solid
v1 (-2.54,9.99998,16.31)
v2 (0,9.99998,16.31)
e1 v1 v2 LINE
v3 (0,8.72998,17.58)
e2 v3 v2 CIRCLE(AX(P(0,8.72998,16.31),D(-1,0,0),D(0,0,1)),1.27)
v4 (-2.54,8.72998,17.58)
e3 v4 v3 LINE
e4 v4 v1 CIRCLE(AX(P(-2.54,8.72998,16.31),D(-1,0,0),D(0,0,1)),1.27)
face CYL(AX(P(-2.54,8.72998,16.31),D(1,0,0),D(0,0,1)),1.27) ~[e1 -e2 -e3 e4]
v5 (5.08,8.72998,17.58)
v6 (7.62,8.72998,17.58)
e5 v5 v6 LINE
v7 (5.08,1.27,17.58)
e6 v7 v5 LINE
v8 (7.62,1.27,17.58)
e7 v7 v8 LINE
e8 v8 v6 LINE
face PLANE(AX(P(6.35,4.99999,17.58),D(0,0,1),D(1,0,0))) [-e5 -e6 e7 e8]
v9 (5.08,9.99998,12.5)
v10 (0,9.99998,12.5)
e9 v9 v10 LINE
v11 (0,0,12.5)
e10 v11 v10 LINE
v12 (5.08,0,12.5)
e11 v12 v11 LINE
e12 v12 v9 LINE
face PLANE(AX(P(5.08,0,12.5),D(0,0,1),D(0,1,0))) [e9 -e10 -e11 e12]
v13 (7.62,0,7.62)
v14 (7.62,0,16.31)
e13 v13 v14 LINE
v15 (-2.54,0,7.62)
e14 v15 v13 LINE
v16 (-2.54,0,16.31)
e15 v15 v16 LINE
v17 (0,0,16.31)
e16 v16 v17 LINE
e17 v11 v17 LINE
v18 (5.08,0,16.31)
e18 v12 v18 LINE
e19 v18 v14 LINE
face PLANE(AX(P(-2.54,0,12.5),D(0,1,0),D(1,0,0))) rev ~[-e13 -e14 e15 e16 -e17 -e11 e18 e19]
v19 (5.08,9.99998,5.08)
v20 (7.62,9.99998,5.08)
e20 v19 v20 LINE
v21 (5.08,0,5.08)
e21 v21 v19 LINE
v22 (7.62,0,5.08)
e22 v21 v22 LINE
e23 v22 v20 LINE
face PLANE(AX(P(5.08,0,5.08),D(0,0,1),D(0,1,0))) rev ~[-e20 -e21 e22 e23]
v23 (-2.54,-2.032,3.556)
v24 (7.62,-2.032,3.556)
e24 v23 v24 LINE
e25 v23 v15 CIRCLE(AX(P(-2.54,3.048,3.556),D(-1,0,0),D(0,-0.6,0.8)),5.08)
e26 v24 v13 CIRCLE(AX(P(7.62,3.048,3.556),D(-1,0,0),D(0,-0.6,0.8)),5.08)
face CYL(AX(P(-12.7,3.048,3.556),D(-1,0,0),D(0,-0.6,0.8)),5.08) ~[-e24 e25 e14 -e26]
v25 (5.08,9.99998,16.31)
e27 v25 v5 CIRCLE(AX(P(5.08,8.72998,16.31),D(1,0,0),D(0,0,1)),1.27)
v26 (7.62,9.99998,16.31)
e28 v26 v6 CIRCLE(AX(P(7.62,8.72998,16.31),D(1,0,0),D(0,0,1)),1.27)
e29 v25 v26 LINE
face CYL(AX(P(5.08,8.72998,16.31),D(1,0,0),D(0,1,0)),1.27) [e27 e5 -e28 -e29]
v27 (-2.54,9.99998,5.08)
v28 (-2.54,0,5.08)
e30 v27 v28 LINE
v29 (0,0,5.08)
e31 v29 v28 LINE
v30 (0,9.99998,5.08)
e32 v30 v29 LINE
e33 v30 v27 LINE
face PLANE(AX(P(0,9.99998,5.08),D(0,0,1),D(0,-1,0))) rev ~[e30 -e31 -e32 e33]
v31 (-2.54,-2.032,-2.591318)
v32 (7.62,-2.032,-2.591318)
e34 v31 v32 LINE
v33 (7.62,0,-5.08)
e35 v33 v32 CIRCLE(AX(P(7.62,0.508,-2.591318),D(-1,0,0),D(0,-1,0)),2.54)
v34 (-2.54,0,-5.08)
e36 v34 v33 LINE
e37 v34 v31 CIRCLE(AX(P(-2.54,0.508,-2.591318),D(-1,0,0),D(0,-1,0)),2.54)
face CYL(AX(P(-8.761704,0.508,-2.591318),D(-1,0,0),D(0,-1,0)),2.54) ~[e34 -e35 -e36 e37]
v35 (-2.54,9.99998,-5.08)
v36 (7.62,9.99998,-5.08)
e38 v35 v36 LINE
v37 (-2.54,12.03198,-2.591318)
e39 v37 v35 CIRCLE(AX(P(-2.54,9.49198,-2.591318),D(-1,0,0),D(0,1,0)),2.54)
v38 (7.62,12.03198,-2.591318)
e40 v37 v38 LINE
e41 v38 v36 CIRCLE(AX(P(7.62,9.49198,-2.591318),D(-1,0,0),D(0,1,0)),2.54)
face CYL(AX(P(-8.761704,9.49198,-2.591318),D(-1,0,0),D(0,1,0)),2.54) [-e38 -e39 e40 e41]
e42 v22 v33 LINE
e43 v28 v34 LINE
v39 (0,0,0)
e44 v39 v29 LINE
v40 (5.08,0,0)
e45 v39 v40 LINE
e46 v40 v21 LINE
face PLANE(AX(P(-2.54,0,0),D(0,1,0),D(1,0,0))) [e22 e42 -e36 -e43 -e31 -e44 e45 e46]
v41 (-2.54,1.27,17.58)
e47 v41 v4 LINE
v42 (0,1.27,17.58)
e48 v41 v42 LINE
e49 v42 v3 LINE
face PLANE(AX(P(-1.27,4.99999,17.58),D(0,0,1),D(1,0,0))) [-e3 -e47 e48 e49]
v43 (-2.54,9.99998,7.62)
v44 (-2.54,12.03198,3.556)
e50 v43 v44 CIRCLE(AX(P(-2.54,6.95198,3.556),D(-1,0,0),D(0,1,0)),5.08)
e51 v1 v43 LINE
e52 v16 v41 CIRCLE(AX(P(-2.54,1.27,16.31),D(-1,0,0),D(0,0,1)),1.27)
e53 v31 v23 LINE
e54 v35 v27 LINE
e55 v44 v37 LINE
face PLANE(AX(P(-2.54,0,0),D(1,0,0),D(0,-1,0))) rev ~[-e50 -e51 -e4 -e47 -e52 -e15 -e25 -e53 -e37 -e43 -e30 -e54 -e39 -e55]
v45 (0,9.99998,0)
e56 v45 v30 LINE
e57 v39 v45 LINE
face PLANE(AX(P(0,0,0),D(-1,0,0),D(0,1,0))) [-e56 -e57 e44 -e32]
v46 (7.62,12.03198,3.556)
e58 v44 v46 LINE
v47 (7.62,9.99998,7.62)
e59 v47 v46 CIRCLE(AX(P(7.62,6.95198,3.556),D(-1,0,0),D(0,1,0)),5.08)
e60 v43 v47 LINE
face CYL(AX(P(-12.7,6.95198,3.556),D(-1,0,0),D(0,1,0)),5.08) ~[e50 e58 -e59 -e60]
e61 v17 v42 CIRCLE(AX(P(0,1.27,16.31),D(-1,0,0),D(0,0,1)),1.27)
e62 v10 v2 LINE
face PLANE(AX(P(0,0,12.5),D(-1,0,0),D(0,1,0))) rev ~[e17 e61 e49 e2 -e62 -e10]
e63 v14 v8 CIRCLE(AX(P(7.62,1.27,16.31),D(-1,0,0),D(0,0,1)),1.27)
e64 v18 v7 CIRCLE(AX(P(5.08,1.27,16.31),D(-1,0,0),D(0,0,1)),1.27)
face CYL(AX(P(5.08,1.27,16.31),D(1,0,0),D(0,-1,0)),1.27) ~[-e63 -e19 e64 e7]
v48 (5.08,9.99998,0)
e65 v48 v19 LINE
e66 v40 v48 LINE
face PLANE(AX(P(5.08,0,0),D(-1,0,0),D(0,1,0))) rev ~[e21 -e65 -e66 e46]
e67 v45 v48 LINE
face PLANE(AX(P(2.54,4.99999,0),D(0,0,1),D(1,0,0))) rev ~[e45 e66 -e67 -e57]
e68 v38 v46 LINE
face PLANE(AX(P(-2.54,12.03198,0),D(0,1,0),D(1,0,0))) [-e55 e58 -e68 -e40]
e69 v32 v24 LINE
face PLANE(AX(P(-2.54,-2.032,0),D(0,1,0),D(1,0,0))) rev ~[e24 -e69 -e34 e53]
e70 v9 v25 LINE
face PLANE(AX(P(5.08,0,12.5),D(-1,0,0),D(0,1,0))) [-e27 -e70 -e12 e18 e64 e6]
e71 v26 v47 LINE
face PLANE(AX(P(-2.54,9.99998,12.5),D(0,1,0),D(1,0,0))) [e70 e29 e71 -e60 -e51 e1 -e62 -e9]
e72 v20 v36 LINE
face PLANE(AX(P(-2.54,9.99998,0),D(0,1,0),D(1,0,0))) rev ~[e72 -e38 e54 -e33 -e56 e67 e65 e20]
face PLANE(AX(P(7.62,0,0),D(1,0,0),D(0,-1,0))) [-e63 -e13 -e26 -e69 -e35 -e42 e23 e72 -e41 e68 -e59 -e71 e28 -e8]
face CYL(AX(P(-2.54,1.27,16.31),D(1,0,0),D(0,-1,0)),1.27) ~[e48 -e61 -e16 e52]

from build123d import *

# Parameters (mm, degrees)
F0_W          = 5.08
F0_H          = 9.99998
F1_DEPTH      = 12.5
F2_W          = 9.99998
F2_H          = 7.42
F3_DEPTH      = 2.54
F4_W          = 9.99998
F4_H          = 7.42
F5_DEPTH      = 2.54
F6_W          = 2.54
F6_H          = 9.99998
F7_DEPTH      = 5.08
F8_W          = 10.16
F8_H          = 2.032
F9_DEPTH      = 5.08
F9_DEPTH_BACK = 7.62
F10_T1_DEPTH  = 30.48
F11_R         = 1.27
F12_T1_DEPTH  = 22.6034078934


# Not quite as in the source:
# - a fillet or chamfer that OpenCascade refuses, or shapes differently, is made with other operations: its cross-section is extruded or revolved along the edge and cut away or added


with BuildPart() as f1:
    # F0 (on Top) → F1 (new body)
    with BuildSketch(Plane.XY):
        with Locations((2.54, 4.99999)):
            Rectangle(F0_W, F0_H)
    extrude(amount=F1_DEPTH)

    # F2 (on face) → F3 (join)
    with BuildSketch(Plane(origin=(0, 0, 0), x_dir=(0, -1, 0), z_dir=(-1, 0, 0))):
        with Locations((-4.99999, 8.79)):
            Rectangle(F2_W, F2_H)
    extrude(amount=F3_DEPTH)

    # F4 (on face) → F5 (join)
    with BuildSketch(Plane.YZ.offset(5.08)):
        with Locations((4.99999, 8.79)):
            Rectangle(F4_W, F4_H)
    extrude(amount=F5_DEPTH)

    # F6 (on face) → F7 (join)
    with BuildSketch(Plane.XY.offset(12.5)):
        with Locations((-1.27, 4.99999)):
            Rectangle(F6_W, F6_H)
        with Locations((6.35, 4.99999)):
            Rectangle(F6_W, F6_H)
    extrude(amount=F7_DEPTH)

    # F8 (on face) → F9 (join, two sides)
    with BuildSketch(Plane(origin=(0, 0, 0), x_dir=(1, 0, 0), z_dir=(0, 0, -1))) as f9_sk:
        with Locations((2.54, 1.016)):
            Rectangle(F8_W, F8_H)
        with Locations((2.54, -11.01598)):
            Rectangle(F8_W, F8_H)
    extrude(amount=F9_DEPTH)
    extrude(f9_sk.sketch, amount=-F9_DEPTH_BACK)

    # F10: fillet of radius 5.08 on 2 edges, made by hand

    # F10_s2 → F10_t1 (cut)
    with BuildSketch(Plane.YZ.offset(-12.7)):
        with BuildLine():
            ThreePointArc((0, 7.62), (-1.4956901303, 5.8278450651), (-2.032, 3.556))
            Line((-2.032, 3.556), (-2.032, 7.62))
            Line((-2.032, 7.62), (0, 7.62))
        make_face()
        with BuildLine():
            ThreePointArc((12.03198, 3.556), (11.4956701303, 5.8278450651), (9.99998, 7.62))
            Line((9.99998, 7.62), (12.03198, 7.62))
            Line((12.03198, 7.62), (12.03198, 3.556))
        make_face()
    extrude(amount=F10_T1_DEPTH, mode=Mode.SUBTRACT)

    # F11
    f11_edges = [f1.edges().sort_by_distance(p)[0] for p in [
        (-1.27, 0, 17.58),
        (6.35, 0, 17.58),
        (6.35, 9.99998, 17.58),
        (-1.27, 9.99998, 17.58),
    ]]
    fillet(f11_edges, radius=F11_R)

    # F12: fillet of radius 2.54 on 2 edges, made by hand

    # F12_s2 → F12_t1 (cut)
    with BuildSketch(Plane.YZ.offset(-8.7617039467)):
        with BuildLine():
            ThreePointArc((-2.032, -2.5913184213), (-1.4594755399, -4.1977554727), (0, -5.08))
            Line((0, -5.08), (-2.032, -5.08))
            Line((-2.032, -5.08), (-2.032, -2.5913184213))
        make_face()
        with BuildLine():
            ThreePointArc((12.03198, -2.5913184213), (11.4594555399, -4.1977554727), (9.99998, -5.08))
            Line((9.99998, -5.08), (12.03198, -5.08))
            Line((12.03198, -5.08), (12.03198, -2.5913184213))
        make_face()
    extrude(amount=F12_T1_DEPTH, mode=Mode.SUBTRACT)


solid = f1.part
